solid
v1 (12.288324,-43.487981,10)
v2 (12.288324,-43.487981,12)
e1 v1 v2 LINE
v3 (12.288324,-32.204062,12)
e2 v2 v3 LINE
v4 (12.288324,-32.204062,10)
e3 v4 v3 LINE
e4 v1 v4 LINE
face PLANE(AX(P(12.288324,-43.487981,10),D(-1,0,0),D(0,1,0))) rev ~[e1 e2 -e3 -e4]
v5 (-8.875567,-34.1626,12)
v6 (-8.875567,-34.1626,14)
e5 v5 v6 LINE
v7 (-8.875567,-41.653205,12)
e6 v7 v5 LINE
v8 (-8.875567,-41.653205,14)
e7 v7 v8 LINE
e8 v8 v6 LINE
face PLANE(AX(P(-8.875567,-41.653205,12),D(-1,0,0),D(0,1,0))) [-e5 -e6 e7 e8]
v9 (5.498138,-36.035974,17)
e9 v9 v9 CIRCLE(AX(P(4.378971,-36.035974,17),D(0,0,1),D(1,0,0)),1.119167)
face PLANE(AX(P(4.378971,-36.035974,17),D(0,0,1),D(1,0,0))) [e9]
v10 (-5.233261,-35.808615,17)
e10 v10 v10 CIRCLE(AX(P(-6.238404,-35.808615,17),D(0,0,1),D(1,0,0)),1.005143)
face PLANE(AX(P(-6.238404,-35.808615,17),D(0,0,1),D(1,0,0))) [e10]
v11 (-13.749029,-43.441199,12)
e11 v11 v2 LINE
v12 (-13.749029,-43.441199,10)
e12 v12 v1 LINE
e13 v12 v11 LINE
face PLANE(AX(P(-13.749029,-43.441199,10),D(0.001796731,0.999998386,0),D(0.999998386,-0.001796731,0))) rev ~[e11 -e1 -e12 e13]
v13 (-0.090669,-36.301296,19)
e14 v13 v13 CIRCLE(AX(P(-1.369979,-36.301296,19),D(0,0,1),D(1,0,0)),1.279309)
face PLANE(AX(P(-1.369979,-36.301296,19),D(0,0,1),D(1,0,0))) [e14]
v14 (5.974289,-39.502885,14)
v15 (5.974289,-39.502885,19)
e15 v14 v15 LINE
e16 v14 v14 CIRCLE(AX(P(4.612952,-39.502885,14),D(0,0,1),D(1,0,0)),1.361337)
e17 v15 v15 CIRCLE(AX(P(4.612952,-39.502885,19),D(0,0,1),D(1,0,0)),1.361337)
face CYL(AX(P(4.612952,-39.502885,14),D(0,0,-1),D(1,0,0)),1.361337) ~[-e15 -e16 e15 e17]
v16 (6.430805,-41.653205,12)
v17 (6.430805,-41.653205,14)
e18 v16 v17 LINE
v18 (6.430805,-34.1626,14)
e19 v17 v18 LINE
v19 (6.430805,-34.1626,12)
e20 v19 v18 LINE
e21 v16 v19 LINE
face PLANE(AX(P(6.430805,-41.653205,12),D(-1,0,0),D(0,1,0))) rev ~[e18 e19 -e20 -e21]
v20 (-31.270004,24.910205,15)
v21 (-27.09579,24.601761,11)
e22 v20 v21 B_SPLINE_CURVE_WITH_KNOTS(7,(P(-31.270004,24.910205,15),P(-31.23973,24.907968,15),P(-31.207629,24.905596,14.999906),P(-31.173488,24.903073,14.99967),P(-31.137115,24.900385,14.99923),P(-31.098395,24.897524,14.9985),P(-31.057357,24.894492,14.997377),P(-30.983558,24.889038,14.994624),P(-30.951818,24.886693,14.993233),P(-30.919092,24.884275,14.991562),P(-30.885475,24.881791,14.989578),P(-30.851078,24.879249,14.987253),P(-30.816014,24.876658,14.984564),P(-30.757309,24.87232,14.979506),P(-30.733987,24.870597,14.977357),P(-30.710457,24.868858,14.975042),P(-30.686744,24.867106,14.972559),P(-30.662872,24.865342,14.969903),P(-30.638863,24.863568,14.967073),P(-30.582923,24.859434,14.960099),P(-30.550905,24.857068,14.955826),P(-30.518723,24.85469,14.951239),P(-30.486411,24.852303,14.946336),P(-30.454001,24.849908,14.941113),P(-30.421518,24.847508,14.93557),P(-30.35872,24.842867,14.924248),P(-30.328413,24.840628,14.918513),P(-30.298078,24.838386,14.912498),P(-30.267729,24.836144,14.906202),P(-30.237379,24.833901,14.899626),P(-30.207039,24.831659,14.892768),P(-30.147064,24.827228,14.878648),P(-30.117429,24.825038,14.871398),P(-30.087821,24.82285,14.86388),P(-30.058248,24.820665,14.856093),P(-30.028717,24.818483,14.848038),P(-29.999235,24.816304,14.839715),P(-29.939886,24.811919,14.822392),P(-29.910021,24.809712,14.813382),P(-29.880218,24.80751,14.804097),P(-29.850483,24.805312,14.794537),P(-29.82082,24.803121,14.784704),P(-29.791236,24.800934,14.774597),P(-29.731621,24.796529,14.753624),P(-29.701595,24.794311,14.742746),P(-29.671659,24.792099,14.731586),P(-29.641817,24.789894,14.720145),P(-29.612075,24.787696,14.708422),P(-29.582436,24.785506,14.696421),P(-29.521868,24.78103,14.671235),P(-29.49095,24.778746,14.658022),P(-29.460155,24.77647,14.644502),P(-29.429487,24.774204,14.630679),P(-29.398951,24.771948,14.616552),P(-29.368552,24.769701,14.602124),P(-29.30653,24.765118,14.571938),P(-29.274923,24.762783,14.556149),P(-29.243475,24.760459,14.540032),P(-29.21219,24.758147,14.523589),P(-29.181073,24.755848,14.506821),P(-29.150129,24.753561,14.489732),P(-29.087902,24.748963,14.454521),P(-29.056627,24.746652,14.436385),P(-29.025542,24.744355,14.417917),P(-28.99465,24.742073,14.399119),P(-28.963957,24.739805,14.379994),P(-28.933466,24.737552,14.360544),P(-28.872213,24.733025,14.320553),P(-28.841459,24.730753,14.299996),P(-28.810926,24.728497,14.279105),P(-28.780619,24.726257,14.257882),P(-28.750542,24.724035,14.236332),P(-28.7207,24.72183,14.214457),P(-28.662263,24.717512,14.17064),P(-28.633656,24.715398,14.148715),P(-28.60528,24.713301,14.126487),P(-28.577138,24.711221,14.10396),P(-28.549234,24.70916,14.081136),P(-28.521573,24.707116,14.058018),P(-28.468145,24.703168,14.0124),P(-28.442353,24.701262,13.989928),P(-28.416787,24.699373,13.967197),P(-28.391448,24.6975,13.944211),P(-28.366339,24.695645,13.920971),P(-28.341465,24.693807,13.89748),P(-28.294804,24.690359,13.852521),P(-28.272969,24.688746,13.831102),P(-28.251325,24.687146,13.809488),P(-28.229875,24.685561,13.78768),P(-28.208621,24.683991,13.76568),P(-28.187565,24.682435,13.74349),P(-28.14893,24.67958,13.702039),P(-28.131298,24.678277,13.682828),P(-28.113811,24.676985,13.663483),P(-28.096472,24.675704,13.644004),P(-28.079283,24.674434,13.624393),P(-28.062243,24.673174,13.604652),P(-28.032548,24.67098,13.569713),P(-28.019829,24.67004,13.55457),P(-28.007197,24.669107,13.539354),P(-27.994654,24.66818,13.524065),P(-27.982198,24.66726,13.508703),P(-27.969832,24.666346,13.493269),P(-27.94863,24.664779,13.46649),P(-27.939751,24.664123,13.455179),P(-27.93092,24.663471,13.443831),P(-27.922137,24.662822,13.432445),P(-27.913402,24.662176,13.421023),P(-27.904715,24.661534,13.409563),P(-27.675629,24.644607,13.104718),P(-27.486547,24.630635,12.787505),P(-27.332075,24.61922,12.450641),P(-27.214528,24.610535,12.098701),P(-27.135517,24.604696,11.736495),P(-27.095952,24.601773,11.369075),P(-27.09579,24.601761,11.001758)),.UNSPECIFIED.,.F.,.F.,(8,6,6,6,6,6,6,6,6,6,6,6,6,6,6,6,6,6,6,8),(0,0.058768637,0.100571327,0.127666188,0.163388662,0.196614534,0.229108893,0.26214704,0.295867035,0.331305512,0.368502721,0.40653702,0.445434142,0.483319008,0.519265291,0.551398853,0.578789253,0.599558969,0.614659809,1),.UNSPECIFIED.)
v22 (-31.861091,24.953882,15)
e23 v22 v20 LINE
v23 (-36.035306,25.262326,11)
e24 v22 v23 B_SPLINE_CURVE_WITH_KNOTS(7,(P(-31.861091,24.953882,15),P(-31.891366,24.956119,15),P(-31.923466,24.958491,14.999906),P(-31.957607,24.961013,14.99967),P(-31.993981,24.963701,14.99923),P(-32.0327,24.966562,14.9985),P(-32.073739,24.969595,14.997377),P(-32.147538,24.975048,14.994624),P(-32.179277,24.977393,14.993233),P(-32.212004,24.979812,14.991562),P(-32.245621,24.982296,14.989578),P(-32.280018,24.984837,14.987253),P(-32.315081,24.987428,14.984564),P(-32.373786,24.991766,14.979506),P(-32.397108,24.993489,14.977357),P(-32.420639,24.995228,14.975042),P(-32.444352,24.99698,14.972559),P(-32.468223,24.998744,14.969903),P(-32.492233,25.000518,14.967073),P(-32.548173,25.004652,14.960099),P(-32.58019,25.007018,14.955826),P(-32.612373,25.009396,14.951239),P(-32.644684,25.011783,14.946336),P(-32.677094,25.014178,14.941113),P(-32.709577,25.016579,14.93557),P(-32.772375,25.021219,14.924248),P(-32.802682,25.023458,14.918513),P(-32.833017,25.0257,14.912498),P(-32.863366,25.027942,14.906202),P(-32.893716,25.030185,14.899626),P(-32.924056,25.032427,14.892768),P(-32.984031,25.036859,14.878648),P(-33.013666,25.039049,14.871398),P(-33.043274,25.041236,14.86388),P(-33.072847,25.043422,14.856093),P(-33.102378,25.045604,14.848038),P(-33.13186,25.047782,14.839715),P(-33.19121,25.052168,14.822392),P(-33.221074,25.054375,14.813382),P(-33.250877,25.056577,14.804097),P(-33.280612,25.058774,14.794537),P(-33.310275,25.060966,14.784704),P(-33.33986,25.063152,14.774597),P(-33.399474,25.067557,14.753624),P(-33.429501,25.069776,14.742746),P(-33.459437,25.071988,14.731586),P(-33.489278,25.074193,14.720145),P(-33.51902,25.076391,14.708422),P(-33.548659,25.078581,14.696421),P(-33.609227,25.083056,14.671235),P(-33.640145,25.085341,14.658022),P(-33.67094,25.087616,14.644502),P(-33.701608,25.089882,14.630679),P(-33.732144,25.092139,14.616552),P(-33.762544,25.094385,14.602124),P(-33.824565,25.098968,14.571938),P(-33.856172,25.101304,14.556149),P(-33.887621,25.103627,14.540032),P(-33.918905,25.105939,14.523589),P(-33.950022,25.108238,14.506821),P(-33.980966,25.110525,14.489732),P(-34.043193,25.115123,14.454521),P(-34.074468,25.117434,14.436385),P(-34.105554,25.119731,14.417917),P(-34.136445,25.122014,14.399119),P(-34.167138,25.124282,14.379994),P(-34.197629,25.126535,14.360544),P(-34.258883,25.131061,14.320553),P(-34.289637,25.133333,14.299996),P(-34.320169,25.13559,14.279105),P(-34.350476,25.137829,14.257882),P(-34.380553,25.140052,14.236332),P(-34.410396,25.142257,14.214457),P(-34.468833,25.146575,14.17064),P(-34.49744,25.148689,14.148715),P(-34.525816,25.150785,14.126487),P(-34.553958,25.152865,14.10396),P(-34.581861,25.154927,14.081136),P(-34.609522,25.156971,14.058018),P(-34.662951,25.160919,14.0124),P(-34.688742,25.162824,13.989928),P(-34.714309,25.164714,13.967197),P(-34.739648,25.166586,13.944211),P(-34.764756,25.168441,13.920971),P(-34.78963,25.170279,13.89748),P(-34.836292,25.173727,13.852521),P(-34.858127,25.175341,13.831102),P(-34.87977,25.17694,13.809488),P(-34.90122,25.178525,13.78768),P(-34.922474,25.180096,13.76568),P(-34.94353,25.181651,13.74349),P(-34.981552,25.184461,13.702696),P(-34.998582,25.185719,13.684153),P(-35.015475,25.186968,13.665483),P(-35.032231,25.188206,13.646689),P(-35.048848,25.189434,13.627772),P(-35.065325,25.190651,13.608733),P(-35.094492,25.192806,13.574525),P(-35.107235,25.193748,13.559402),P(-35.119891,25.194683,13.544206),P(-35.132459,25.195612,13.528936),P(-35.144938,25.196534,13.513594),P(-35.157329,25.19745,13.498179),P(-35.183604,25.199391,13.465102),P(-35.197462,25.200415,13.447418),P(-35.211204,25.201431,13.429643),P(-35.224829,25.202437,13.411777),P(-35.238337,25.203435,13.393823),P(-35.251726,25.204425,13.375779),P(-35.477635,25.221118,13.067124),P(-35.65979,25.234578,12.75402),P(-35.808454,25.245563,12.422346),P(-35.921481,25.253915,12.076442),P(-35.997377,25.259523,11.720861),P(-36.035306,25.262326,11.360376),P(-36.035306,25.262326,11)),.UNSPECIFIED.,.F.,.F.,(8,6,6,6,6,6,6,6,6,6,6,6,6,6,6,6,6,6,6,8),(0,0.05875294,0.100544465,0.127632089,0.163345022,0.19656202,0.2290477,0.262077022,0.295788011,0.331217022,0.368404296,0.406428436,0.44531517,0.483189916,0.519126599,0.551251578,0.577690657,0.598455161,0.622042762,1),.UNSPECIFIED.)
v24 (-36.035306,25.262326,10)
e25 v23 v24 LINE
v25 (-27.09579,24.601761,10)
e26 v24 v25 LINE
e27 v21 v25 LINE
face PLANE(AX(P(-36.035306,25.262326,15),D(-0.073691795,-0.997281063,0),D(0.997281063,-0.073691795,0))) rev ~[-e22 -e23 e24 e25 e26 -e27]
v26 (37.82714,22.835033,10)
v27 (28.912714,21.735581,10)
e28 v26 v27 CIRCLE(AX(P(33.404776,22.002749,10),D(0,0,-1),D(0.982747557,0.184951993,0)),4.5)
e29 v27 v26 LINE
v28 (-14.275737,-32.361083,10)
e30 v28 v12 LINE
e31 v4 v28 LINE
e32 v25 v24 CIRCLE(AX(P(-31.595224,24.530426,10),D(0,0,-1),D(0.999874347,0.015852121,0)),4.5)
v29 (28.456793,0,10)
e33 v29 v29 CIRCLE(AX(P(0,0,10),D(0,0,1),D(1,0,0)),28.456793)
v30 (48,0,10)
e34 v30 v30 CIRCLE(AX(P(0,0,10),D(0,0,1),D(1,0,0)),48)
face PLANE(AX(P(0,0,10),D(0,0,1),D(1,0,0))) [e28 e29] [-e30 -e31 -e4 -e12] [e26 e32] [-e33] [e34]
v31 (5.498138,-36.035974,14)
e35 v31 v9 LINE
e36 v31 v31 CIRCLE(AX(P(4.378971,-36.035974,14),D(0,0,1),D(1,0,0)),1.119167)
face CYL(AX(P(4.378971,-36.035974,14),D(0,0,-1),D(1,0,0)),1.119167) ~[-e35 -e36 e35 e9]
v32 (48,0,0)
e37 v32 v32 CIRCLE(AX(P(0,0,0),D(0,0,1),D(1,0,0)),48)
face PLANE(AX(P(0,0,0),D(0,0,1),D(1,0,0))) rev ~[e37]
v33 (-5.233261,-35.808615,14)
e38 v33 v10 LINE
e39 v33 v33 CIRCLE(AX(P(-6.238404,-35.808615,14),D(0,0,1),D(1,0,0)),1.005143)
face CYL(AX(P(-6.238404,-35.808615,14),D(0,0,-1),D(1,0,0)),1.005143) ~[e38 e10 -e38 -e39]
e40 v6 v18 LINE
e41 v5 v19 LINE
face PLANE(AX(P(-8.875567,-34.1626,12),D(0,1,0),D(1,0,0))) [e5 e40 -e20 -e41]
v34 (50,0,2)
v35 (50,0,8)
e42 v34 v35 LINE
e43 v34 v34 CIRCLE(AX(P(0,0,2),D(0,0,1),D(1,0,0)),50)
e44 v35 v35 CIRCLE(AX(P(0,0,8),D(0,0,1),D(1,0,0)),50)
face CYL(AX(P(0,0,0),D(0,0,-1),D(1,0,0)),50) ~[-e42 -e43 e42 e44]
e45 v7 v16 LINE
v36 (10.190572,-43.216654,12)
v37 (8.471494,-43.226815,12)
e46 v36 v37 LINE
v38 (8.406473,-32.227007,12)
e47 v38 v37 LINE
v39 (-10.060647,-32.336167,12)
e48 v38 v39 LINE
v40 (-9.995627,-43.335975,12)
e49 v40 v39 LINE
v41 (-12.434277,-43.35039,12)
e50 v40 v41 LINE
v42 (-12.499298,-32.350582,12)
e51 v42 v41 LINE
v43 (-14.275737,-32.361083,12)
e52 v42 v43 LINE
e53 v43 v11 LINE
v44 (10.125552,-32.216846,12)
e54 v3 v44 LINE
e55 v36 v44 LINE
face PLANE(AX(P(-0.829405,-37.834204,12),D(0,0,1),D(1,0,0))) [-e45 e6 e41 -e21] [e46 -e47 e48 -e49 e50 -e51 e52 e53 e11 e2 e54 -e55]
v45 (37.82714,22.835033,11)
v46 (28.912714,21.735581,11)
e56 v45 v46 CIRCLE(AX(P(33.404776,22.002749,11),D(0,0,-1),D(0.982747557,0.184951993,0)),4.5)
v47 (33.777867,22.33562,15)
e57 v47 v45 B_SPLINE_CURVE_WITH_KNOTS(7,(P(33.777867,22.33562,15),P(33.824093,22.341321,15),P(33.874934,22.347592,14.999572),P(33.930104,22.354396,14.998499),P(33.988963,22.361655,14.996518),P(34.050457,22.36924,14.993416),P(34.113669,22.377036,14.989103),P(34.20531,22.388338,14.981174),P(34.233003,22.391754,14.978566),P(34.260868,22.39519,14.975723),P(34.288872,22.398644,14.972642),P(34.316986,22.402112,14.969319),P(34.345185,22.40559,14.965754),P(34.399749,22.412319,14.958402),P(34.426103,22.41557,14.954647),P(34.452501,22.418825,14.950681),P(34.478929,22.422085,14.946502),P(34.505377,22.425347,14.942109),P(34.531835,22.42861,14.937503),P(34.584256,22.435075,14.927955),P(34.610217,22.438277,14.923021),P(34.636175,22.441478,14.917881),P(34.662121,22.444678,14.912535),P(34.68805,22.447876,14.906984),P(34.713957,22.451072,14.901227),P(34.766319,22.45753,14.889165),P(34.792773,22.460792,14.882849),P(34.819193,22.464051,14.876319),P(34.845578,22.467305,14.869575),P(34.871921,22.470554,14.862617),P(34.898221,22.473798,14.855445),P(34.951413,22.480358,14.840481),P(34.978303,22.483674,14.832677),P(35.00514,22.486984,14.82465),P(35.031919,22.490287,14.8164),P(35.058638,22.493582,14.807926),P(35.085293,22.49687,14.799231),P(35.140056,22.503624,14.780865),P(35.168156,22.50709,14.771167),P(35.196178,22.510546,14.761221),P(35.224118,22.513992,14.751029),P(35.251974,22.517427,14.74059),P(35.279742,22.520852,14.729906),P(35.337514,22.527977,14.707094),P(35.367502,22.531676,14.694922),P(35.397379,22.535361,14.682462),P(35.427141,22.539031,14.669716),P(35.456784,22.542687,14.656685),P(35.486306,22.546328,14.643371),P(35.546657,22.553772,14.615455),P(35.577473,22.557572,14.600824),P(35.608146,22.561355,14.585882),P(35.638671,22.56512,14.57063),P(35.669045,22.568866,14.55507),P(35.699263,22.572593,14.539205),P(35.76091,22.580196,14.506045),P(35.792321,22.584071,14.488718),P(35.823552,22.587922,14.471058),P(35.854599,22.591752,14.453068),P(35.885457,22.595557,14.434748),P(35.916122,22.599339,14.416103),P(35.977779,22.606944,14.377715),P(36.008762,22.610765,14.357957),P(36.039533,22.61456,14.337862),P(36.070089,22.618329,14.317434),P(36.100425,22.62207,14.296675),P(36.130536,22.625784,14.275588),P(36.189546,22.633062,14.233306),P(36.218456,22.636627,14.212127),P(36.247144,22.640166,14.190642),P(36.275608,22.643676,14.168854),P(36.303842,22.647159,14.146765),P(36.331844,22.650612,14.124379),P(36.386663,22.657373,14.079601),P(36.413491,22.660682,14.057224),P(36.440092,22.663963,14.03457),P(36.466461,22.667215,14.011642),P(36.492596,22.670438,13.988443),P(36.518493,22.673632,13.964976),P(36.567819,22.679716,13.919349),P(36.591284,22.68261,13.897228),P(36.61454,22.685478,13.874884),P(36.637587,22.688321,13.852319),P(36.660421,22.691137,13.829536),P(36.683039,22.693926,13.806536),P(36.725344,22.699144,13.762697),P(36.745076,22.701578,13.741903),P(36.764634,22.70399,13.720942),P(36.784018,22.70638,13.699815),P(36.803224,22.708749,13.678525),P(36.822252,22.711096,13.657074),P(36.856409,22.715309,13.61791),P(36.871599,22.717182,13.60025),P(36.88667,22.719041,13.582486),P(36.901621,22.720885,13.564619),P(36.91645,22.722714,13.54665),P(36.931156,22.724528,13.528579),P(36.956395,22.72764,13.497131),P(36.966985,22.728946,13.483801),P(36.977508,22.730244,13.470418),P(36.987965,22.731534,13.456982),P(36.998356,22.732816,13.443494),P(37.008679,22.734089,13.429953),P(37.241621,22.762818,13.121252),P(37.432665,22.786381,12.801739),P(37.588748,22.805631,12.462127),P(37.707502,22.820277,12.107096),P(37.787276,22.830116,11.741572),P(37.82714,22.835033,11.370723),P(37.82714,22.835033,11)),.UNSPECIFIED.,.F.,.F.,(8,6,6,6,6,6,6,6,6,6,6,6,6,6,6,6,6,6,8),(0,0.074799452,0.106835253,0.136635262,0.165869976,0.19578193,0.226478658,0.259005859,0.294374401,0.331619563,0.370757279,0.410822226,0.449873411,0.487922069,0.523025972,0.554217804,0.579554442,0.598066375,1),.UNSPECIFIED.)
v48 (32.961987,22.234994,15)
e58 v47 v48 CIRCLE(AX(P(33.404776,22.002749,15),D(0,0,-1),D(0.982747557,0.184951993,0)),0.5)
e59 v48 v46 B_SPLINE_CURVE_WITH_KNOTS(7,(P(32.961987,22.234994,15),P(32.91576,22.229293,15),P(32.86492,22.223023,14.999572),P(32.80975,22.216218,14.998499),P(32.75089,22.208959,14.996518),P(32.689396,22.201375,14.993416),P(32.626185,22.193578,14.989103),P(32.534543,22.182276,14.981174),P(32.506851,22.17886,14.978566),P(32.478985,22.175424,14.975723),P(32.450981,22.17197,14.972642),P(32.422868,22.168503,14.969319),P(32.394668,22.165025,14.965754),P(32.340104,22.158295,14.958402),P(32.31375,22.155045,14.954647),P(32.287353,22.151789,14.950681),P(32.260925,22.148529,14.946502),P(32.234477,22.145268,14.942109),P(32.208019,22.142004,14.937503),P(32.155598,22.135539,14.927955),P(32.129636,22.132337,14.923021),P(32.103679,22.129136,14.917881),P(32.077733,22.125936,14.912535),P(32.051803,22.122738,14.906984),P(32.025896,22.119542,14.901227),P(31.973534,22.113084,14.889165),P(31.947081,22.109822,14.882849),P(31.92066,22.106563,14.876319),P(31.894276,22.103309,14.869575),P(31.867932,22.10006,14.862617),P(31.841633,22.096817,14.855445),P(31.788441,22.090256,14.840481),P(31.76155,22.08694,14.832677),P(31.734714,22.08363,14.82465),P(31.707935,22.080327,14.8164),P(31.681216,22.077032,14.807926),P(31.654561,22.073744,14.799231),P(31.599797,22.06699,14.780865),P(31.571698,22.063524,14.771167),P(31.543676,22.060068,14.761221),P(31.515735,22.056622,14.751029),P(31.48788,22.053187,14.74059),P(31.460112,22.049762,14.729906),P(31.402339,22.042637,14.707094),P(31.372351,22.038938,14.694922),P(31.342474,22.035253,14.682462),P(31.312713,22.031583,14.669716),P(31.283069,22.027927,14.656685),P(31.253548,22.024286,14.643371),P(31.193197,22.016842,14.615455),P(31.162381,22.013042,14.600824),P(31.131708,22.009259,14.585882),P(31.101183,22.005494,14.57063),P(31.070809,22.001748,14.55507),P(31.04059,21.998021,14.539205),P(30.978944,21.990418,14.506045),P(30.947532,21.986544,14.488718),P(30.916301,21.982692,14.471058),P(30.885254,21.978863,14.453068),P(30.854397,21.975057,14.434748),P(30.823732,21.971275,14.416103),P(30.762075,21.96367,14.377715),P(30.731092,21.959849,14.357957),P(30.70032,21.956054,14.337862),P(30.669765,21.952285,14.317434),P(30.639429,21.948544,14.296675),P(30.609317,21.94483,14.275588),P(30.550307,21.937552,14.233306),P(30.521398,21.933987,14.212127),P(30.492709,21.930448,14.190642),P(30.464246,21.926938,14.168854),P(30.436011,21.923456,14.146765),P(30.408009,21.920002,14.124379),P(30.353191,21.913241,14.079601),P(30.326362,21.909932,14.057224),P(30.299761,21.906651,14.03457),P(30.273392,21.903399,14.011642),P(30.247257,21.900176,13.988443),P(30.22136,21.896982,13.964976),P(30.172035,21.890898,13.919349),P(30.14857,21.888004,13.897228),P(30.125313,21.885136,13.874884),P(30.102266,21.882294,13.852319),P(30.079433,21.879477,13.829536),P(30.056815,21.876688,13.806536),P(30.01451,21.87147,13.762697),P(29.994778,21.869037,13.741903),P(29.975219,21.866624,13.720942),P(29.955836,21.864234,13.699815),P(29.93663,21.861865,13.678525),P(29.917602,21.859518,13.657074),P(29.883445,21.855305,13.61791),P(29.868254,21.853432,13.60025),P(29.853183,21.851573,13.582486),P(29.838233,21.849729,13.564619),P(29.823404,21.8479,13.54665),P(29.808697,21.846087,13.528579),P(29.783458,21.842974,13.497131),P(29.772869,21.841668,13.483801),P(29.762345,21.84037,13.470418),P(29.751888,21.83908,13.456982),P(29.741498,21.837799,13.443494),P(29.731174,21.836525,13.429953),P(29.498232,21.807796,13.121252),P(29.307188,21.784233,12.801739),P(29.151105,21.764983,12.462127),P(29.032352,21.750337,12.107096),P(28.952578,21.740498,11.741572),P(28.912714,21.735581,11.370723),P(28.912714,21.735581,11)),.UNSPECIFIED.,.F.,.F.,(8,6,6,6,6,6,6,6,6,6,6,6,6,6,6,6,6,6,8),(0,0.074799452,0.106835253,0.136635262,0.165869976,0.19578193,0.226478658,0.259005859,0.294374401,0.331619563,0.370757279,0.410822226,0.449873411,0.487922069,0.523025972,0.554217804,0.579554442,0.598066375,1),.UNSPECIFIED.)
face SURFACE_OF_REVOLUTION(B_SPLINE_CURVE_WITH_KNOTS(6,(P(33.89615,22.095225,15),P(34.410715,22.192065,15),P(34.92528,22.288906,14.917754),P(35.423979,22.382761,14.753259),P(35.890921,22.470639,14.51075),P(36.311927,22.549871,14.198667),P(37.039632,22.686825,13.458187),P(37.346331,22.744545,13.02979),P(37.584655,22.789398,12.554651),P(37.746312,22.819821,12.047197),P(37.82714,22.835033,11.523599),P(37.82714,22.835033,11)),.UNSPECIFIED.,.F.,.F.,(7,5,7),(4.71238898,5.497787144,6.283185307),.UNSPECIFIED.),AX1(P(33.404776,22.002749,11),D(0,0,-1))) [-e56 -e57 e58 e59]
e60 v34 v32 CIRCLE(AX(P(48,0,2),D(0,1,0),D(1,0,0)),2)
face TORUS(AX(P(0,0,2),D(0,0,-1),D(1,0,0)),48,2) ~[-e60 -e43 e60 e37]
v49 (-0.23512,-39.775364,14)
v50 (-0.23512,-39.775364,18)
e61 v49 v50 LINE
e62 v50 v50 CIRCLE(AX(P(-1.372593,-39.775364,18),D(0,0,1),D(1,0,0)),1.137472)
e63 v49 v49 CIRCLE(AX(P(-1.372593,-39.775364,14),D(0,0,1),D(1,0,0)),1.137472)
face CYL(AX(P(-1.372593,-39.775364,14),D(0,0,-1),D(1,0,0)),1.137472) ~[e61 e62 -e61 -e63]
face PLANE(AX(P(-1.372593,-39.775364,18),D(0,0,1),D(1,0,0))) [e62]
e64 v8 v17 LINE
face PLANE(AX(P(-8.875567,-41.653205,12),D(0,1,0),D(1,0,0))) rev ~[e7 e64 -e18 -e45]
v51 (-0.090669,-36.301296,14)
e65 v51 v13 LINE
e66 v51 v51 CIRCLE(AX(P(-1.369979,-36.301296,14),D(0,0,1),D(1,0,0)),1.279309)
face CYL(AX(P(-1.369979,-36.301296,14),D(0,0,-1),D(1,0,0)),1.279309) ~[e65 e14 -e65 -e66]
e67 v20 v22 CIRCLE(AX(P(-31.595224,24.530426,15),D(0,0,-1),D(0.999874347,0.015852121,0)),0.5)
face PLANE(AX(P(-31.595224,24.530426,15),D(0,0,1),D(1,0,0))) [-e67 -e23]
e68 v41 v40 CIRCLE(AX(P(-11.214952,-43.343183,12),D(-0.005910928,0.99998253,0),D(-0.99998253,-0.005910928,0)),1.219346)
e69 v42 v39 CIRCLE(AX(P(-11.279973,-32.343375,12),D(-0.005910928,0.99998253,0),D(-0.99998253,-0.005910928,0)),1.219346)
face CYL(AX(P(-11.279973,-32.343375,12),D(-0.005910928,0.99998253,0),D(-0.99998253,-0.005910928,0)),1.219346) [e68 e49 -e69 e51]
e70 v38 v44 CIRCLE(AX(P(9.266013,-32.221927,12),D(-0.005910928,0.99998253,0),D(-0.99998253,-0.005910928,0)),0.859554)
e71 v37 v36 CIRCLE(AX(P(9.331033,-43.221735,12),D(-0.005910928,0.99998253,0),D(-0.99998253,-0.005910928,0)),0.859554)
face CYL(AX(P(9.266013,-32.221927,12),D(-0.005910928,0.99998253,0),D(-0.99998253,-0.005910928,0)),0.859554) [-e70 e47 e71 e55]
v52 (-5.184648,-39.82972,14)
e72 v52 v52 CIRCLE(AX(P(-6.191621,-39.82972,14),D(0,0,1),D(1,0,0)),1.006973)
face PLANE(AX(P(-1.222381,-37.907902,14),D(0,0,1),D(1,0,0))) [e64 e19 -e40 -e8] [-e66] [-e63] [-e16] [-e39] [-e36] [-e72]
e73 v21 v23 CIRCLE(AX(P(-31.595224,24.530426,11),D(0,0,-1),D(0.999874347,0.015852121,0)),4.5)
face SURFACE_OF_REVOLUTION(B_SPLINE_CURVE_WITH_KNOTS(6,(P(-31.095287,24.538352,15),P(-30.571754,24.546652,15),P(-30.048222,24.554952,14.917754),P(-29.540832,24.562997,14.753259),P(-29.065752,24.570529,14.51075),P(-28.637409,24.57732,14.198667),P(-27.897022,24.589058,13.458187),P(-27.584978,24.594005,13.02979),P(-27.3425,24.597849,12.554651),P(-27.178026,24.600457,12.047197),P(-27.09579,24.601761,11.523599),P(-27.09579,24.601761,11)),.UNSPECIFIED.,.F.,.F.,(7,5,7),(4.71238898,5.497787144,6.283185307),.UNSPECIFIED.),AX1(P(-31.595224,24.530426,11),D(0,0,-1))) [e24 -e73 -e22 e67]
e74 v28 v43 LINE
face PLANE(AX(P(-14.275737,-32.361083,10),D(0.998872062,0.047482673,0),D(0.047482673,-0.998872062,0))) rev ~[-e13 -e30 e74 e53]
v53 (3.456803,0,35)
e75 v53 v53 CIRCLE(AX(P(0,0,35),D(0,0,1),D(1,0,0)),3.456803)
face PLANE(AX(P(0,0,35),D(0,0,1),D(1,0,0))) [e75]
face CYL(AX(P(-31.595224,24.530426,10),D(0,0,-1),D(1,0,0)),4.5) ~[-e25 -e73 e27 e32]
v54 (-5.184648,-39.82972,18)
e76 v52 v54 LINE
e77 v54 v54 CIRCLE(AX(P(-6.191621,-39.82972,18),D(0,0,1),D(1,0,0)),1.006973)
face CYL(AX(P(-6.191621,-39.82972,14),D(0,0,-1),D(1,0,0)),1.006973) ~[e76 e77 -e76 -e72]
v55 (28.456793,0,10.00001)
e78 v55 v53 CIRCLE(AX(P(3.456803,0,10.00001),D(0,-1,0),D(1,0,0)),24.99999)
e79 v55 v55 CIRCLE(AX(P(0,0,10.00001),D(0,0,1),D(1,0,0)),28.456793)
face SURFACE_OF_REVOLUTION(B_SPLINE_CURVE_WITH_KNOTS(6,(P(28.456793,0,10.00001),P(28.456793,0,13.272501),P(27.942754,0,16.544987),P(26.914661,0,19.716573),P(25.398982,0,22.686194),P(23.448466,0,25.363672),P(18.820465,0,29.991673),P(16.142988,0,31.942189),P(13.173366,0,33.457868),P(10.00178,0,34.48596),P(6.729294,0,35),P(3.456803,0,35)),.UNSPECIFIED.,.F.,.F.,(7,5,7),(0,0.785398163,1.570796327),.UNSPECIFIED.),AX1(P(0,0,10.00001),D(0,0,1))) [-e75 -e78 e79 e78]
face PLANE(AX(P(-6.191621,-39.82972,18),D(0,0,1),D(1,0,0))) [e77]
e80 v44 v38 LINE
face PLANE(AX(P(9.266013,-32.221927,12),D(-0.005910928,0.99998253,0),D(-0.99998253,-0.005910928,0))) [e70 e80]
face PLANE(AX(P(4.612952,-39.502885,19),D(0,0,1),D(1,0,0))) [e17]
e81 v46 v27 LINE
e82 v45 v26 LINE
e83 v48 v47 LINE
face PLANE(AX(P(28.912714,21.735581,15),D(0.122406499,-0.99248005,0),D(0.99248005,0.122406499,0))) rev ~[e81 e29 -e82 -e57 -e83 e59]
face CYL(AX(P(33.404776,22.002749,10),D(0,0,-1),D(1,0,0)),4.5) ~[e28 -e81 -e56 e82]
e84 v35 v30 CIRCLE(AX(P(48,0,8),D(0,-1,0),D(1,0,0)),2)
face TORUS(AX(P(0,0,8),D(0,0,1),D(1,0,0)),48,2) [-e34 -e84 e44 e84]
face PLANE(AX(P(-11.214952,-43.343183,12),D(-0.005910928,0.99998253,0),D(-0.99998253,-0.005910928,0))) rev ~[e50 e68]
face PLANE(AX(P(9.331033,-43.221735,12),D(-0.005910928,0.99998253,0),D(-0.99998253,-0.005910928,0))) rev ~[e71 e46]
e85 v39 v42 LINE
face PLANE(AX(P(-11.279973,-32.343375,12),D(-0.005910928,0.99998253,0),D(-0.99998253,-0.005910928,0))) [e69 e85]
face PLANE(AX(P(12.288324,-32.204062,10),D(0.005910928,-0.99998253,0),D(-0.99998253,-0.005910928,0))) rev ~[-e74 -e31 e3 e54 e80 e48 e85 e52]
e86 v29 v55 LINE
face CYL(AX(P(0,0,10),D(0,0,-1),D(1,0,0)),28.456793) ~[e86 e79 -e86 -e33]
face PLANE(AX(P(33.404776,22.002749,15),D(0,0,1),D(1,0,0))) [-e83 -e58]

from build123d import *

# Parameters (mm, degrees)
F0_R      = 50
F1_DEPTH  = 10
F2_R      = 2
F3_R      = 28.456793416
F4_DEPTH  = 25
F5_R      = 24.99999
F6_R      = 4.5
F7_DEPTH  = 5
F9_DEPTH  = 5
F10_R     = 4
F12_DEPTH = 5
F13_R     = 4
F15_DEPTH = 2
F16_R     = 0.8595542321
F16_R_2   = 1.219346416
F17_DEPTH = 11
F18_W     = 15.3063726611
F18_H     = 7.4906051159
F19_DEPTH = 2
F20_R     = 1.3613365602
F20_R_2   = 1.2793093954
F21_DEPTH = 5
F20_R_3   = 1.0051427106
F20_R_4   = 1.1191673647
F22_DEPTH = 3
F20_R_5   = 1.0069734003
F20_R_6   = 1.1374722919
F23_DEPTH = 4


# Not quite as in the source:
# - a fillet or chamfer is up to 0.001 mm smaller than in the source, because OpenCascade refuses the exact size


with BuildPart() as f1:
    # F0 (on Top) → F1 (new body)
    with BuildSketch(Plane.XY):
        Circle(F0_R)
    extrude(amount=F1_DEPTH)

    # F2
    f2_edges = [f1.edges().sort_by_distance(p)[0] for p in [
        (-50, 0, 10),
        (-50, 0, 0),
    ]]
    fillet(f2_edges, radius=F2_R)

    # F3 (on face) → F4 (join)
    with BuildSketch(Plane.XY.offset(10)):
        Circle(F3_R)
    extrude(amount=F4_DEPTH)

    # F5 (radius 25 in the source; OpenCascade refuses exactly that, so slightly less here)
    f5_edges = [f1.edges().sort_by_distance(p)[0] for p in [
        (-28.456793, 0, 35),
    ]]
    fillet(f5_edges, radius=F5_R)

    # F6 (on face) → F7 (join)
    with BuildSketch(Plane.XY.offset(10)):
        with Locations((-31.595224242, 24.5304261092)):
            Circle(F6_R)
        with Locations((33.404775758, 22.0027488409)):
            Circle(F6_R)
    extrude(amount=F7_DEPTH)

    # F8 (on face) → F9 (cut)
    with BuildSketch(Plane.XY.offset(15)):
        with BuildLine():
            Line((28.9127137026, 21.7355813083), (37.8271397629, 22.8350328115))
            ThreePointArc((37.8271397629, 22.8350328115), (32.8360512403, 26.6140051327), (28.9127137026, 21.7355813083))
        make_face()
        with BuildLine():
            Line((28.9127137026, 21.7355813083), (37.8271397629, 22.8350328115))
            ThreePointArc((37.8271397629, 22.8350328115), (32.8539465135, 26.4689090646), (28.9127137026, 21.7355813083))
        make_face()
    extrude(amount=-F9_DEPTH, mode=Mode.SUBTRACT)

    # F10
    f10_edges = [f1.edges().sort_by_distance(p)[0] for p in [
        (33.955605, 17.536589, 15),
    ]]
    fillet(f10_edges, radius=F10_R)

    # F11 (on face) → F12 (cut)
    with BuildSketch(Plane.XY.offset(15)):
        with BuildLine():
            Line((-36.0353056642, 25.2623256677), (-27.0957896794, 24.6017606519))
            ThreePointArc((-27.0957896794, 24.6017606519), (-31.2565181281, 29.1141819041), (-36.0353056642, 25.2623256677))
        make_face()
        with BuildLine():
            Line((-36.0353056642, 25.2623256677), (-27.0957896794, 24.6017606519))
            ThreePointArc((-27.0957896794, 24.6017606519), (-31.2636111635, 29.0181908942), (-36.0353056642, 25.2623256677))
        make_face()
    extrude(amount=-F12_DEPTH, mode=Mode.SUBTRACT)

    # F13
    f13_edges = [f1.edges().sort_by_distance(p)[0] for p in [
        (-31.926837, 20.042661, 15),
    ]]
    fillet(f13_edges, radius=F13_R)

    # F14 (on face) → F15 (join)
    with BuildSketch(Plane.XY.offset(10)):
        Polygon((-13.7490294874, -43.4411987662), (12.2883236036, -43.4879809618), (12.2883236036, -32.2040617466), (-14.2757371068, -32.3610827327), align=None)
    extrude(amount=F15_DEPTH)

    # F16 (on face) → F17 (join)
    with BuildSketch(Plane(origin=(0.1907818986, -32.2755706905, 0), x_dir=(-0.9999825303, -0.0059109277, 0), z_dir=(-0.0059109277, 0.9999825303, 0))):
        with Locations((-9.0753892437, 12)):
            Circle(F16_R)
        with Locations((11.4709548652, 12)):
            Circle(F16_R_2)
    extrude(amount=-F17_DEPTH)

    # F18 (on face) → F19 (join)
    with BuildSketch(Plane.XY.offset(12)):
        with Locations((-1.2223811354, -37.9079021513)):
            Rectangle(F18_W, F18_H)
    extrude(amount=F19_DEPTH)

    # F20 (on face) → F21 (join)
    with BuildSketch(Plane.XY.offset(14)):
        with Locations((4.6129520051, -39.5028851926)):
            Circle(F20_R)
        with Locations((-1.3699786505, -36.3012962043)):
            Circle(F20_R_2)
    extrude(amount=F21_DEPTH)

    # F20 (on face) → F22 (join)
    with BuildSketch(Plane.XY.offset(14)):
        with Locations((-6.2384037301, -35.8086153865)):
            Circle(F20_R_3)
        with Locations((4.3789707124, -36.0359735787)):
            Circle(F20_R_4)
    extrude(amount=F22_DEPTH)

    # F20 (on face) → F23 (join)
    with BuildSketch(Plane.XY.offset(14)):
        with Locations((-6.1916210689, -39.8297198117)):
            Circle(F20_R_5)
        with Locations((-1.3725927565, -39.7753641009)):
            Circle(F20_R_6)
    extrude(amount=F23_DEPTH)


solid = f1.part
